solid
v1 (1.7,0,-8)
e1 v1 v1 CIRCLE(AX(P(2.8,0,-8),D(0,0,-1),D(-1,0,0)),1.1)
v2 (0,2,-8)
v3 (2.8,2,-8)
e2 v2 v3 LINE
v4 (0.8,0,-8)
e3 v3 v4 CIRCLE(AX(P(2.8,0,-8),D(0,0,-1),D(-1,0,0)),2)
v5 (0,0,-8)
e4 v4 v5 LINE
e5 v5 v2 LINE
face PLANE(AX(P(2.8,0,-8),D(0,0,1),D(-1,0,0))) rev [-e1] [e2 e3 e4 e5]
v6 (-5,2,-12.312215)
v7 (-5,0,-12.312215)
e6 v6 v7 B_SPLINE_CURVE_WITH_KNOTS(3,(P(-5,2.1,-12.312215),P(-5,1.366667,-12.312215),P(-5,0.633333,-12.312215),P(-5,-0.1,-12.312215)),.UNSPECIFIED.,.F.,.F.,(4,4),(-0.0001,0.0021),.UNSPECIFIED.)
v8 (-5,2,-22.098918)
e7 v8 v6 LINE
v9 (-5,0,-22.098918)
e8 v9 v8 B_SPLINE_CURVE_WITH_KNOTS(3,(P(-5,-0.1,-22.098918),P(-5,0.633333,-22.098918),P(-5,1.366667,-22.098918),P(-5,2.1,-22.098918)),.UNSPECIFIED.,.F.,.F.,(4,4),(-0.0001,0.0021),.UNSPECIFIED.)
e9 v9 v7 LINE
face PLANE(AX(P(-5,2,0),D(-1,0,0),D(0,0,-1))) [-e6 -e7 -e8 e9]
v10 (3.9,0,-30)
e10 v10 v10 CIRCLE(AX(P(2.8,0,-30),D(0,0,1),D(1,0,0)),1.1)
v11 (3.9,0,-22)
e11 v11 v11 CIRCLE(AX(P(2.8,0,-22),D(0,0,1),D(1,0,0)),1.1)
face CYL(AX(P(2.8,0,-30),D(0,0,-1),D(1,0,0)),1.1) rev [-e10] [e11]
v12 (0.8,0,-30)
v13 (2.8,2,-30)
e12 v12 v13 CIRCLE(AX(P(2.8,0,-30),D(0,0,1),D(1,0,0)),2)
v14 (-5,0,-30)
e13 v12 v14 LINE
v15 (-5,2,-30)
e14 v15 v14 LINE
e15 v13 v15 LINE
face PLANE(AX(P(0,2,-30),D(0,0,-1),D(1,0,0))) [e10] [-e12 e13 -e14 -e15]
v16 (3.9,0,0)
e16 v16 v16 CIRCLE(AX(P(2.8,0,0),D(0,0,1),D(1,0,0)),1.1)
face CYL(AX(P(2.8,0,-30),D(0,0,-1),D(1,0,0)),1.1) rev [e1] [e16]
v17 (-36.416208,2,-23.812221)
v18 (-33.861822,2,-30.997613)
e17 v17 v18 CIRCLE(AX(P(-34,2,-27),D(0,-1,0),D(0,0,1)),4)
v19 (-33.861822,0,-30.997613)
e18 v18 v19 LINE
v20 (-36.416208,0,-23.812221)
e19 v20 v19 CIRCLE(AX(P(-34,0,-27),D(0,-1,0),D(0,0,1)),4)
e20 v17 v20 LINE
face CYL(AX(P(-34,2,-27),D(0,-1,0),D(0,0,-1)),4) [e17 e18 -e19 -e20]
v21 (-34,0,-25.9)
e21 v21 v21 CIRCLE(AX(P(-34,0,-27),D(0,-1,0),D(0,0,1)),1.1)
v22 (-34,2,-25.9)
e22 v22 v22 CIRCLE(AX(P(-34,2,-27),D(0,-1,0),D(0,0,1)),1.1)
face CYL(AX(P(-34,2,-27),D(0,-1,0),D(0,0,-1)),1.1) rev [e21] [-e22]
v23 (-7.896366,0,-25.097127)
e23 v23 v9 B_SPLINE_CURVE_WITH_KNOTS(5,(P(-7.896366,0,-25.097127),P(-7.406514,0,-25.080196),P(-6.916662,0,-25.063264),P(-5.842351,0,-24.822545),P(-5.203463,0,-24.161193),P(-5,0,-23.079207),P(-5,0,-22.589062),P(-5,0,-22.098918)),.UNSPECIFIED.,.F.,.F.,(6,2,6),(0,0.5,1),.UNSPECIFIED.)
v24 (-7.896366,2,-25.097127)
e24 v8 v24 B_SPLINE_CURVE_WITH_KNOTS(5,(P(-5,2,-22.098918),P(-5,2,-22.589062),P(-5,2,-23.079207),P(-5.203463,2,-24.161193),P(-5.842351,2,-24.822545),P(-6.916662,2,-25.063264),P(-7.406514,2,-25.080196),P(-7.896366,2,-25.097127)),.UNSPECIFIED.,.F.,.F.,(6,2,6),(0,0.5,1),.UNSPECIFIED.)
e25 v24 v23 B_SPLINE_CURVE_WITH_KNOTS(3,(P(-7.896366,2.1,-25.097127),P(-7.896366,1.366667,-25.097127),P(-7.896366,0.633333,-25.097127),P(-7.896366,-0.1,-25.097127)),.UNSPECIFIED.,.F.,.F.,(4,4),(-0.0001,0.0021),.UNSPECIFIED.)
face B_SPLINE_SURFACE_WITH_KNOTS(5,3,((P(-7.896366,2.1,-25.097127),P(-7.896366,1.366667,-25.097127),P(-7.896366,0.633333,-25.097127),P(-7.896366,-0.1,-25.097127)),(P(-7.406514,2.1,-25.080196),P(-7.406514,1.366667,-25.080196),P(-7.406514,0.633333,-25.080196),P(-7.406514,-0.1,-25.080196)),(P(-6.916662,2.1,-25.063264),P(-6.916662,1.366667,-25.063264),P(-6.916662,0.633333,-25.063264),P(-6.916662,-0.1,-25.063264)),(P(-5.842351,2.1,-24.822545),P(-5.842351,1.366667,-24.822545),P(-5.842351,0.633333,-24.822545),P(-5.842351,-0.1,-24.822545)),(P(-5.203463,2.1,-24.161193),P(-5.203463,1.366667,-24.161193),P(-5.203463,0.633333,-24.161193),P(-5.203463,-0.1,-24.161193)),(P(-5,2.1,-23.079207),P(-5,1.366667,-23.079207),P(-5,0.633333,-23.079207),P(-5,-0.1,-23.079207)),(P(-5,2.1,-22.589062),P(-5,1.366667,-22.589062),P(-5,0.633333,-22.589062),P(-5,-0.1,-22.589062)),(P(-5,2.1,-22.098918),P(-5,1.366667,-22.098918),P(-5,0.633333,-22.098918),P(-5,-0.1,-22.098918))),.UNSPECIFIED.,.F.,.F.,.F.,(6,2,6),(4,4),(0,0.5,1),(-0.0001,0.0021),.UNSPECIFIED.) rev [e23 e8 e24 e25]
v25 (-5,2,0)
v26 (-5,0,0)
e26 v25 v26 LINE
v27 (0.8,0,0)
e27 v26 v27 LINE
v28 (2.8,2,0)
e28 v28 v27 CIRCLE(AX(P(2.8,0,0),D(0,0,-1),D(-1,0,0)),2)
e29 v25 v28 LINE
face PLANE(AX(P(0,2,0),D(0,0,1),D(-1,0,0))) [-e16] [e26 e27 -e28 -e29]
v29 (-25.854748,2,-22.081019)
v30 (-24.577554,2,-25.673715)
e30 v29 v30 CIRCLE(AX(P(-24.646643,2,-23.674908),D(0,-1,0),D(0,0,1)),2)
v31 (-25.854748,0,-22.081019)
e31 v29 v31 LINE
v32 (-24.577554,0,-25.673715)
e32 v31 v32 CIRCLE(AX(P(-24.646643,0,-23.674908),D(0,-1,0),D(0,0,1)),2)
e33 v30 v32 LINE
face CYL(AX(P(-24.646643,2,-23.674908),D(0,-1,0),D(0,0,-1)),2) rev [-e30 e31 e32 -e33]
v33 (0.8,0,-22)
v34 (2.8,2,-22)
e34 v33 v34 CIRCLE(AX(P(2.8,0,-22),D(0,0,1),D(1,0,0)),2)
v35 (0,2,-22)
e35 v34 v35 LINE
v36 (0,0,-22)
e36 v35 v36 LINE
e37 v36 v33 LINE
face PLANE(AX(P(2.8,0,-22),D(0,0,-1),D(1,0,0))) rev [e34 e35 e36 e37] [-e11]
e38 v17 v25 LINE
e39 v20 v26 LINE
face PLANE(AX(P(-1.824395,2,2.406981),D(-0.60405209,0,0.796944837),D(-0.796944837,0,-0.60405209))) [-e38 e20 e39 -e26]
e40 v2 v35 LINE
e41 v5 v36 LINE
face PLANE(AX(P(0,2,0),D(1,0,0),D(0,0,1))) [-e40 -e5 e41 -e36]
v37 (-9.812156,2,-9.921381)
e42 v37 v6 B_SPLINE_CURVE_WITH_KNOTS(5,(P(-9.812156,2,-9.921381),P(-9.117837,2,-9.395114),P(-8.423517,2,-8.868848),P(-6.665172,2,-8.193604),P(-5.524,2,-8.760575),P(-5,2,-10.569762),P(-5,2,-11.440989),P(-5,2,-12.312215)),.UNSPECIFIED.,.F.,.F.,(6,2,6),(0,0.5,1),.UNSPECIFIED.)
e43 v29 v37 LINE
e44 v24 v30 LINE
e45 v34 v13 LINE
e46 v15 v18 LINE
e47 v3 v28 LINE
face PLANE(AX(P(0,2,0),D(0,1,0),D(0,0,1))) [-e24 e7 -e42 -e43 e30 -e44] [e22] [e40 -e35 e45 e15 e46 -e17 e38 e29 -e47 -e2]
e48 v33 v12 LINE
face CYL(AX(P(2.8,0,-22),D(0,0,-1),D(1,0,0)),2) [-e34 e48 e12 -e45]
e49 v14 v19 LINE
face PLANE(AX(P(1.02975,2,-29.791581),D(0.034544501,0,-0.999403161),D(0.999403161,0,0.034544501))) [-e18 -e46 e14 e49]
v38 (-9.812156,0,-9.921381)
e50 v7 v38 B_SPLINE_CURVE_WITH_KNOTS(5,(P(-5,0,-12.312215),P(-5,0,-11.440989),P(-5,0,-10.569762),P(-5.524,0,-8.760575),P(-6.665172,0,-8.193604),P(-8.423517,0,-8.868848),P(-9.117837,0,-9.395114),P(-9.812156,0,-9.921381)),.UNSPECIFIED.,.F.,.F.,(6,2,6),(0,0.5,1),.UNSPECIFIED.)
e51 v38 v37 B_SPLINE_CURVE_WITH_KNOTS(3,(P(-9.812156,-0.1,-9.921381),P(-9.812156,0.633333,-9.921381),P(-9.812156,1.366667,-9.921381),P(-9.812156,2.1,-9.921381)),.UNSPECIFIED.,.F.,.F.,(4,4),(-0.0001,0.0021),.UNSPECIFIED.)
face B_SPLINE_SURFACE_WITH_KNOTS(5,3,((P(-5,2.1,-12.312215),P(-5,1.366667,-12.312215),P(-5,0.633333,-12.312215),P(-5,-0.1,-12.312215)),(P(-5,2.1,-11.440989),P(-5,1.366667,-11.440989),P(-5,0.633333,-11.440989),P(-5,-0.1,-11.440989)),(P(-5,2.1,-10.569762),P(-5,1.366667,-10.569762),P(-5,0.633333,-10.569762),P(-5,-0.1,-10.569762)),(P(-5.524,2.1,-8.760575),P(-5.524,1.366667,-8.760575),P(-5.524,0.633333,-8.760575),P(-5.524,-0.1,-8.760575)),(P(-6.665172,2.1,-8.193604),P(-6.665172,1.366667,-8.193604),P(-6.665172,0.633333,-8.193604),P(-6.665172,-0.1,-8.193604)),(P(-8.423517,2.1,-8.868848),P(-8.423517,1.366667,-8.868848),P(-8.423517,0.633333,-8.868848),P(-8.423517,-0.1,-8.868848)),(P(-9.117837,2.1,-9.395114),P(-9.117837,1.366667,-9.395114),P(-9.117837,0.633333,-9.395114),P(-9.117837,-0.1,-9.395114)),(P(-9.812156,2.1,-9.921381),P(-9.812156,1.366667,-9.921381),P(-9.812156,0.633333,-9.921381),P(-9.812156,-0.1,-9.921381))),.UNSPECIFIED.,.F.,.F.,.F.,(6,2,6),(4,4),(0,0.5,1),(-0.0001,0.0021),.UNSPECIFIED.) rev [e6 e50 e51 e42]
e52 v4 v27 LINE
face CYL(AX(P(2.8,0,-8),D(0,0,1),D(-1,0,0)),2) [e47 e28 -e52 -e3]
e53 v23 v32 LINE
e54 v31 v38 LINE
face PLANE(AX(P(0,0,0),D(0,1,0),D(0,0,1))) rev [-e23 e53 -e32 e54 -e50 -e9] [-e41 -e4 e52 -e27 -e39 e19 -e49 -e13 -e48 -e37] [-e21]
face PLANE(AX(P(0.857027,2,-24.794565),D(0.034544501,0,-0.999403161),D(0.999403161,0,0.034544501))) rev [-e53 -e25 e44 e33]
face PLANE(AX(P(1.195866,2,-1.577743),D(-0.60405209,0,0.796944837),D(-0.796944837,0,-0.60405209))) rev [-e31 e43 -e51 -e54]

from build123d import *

# Parameters (mm, degrees)
SKETCH_1_R              = 1.1
EXTRUDE_1_DEPTH         = 2
EXTRUDE_2_DEPTH         = 8
EXTRUDE_START           = -22
EXTRUDE_3_DEPTH         = 8
HOLE_WIZARD_2_2_2_2_1_D = 2.2


with BuildPart() as part:
    # 草图1 → 凸台-拉伸1 (new body)
    with BuildSketch(Plane(origin=(0, 0, 0), x_dir=(1, 0, 0), z_dir=(0, 1, 0))):
        with BuildLine():
            Line((0, 30), (0, 0))
            Line((0, 0), (5, 0))
            Line((5, 0), (36.416208358, 23.812220652))
            ThreePointArc((36.416208358, 23.812220652), (37.768928241, 28.339843241), (33.861821998, 30.997612643))
            Line((33.861821998, 30.997612643), (5, 30))
            Line((5, 30), (0, 30))
        make_face()
        with BuildLine():
            Line((5, 6.273959963), (5, 24.997014021))
            Line((5, 24.997014021), (24.577554456, 25.673714745))
            ThreePointArc((24.577554456, 25.673714745), (26.531107578, 24.344830044), (25.854747636, 22.08101875))
            Line((25.854747636, 22.08101875), (5, 6.273959963))
        make_face(mode=Mode.SUBTRACT)
        with Locations(Location((34, 27, 0), (0, 0, 270))):
            Circle(SKETCH_1_R, mode=Mode.SUBTRACT)
    extrude(amount=EXTRUDE_1_DEPTH)

    # 圆角1
    # a fillet whose section is not a circle: 3 mm, written as the material it adds along each edge (its section moved 0.00015 mm through the faces so that the kernel can cut it)
    with BuildSketch(Plane(origin=(5, 0, -6.273959963), x_dir=(-2.4841613370279438e-05, 0, -0.999999999691447), z_dir=(0, 1, 0))) as fillet_1_piece_1:
        with BuildLine():
            add(Edge.make_bspline([(6.038255155, 0), (5.16698511, 2.1644e-05), (4.295715065, 4.3288e-05), (2.48642459, -0.523937582), (1.919396592, -1.665153012), (2.594631071, -3.423603004), (3.120906314, -4.117970242), (3.647181556, -4.81233748)], knots=[0, 0, 0, 0, 0, 0, 0.5, 0.5, 1, 1, 1, 1, 1, 1], degree=5))
            Line((3.647181556, -4.81233748), (3.599363965, -4.848579417))
            ThreePointArc((3.599363965, -4.848579417), (1.775832959, -2.442365375), (-0.047817591, -0.036241938))
            Line((-0.047817591, -0.036241938), (1.49e-06, 0.06))
            ThreePointArc((1.49e-06, 0.06), (3.019129066, 0.059925), (6.038256646, 0.06))
            Line((6.038256646, 0.06), (6.038255155, 0))
        make_face()
    extrude(amount=2)
    with BuildSketch(Plane(origin=(5, 0, -24.997014021), x_dir=(-5.1758116243326517e-05, 0, 0.9999999986605487), z_dir=(0, 1, 0))) as fillet_1_piece_2:
        with BuildLine():
            add(Edge.make_bspline([(2.8980962, 0), (2.407927047, -2.537e-05), (1.917757895, -5.074e-05), (0.835707431, 0.203366759), (0.1742891, 0.842251897), (-0.066497099, 1.916604675), (-0.083455103, 2.406480399), (-0.100413106, 2.896356123)], knots=[0, 0, 0, 0, 0, 0, 0.5, 0.5, 1, 1, 1, 1, 1, 1], degree=5))
            Line((-0.100413106, 2.896356123), (-0.160377189, 2.894280349))
            ThreePointArc((-0.160377189, 2.894280349), (-0.11009568, 1.446104883), (-0.059964082, -0.002075774))
            Line((-0.059964082, -0.002075774), (3.105e-06, -0.06))
            ThreePointArc((3.105e-06, -0.06), (1.449051202, -0.059925), (2.898099305, -0.06))
            Line((2.898099305, -0.06), (2.8980962, 0))
        make_face()
    extrude(amount=2)

    # 草图2 → 凸台-拉伸2 (add)
    with BuildSketch(Plane(origin=(0, 0, -30), x_dir=(-1, 0, 0), z_dir=(0, 0, -1))):
        with BuildLine():
            Line((0, 2), (2.8, 2))
            ThreePointArc((2.8, 2), (4.214213562, -1.414213562), (0.8, 0))
            Line((0.8, 0), (0, 0))
            Line((0, 0), (0, 2))
        make_face()
    extrude(amount=-EXTRUDE_2_DEPTH)

    # 草图2<2> → 凸台-拉伸3 (add)
    with BuildSketch(Plane(origin=(0, 0, -30), x_dir=(-1, 0, 0), z_dir=(0, 0, -1)).offset(EXTRUDE_START)):
        with BuildLine():
            Line((0, 2), (2.8, 2))
            ThreePointArc((2.8, 2), (4.214213562, -1.414213562), (0.8, 0))
            Line((0.8, 0), (0, 0))
            Line((0, 0), (0, 2))
        make_face()
    extrude(amount=-EXTRUDE_3_DEPTH)

    # Ø2.2 (2.2) 直径孔1 (through all)
    with Locations(Plane(origin=(0, 0, -30), x_dir=(-1, 0, 0), z_dir=(0, 0, -1))):
        with Locations((2.8, 0)):
            Hole(HOLE_WIZARD_2_2_2_2_1_D / 2)


with BuildPart() as body_2:
    # 镜向1: mirrored copy
    add(part.part.mirror(Plane(origin=(0, 0, 0), x_dir=(0, 0, 1), z_dir=(1, 0, 0))))


solid = body_2.part
